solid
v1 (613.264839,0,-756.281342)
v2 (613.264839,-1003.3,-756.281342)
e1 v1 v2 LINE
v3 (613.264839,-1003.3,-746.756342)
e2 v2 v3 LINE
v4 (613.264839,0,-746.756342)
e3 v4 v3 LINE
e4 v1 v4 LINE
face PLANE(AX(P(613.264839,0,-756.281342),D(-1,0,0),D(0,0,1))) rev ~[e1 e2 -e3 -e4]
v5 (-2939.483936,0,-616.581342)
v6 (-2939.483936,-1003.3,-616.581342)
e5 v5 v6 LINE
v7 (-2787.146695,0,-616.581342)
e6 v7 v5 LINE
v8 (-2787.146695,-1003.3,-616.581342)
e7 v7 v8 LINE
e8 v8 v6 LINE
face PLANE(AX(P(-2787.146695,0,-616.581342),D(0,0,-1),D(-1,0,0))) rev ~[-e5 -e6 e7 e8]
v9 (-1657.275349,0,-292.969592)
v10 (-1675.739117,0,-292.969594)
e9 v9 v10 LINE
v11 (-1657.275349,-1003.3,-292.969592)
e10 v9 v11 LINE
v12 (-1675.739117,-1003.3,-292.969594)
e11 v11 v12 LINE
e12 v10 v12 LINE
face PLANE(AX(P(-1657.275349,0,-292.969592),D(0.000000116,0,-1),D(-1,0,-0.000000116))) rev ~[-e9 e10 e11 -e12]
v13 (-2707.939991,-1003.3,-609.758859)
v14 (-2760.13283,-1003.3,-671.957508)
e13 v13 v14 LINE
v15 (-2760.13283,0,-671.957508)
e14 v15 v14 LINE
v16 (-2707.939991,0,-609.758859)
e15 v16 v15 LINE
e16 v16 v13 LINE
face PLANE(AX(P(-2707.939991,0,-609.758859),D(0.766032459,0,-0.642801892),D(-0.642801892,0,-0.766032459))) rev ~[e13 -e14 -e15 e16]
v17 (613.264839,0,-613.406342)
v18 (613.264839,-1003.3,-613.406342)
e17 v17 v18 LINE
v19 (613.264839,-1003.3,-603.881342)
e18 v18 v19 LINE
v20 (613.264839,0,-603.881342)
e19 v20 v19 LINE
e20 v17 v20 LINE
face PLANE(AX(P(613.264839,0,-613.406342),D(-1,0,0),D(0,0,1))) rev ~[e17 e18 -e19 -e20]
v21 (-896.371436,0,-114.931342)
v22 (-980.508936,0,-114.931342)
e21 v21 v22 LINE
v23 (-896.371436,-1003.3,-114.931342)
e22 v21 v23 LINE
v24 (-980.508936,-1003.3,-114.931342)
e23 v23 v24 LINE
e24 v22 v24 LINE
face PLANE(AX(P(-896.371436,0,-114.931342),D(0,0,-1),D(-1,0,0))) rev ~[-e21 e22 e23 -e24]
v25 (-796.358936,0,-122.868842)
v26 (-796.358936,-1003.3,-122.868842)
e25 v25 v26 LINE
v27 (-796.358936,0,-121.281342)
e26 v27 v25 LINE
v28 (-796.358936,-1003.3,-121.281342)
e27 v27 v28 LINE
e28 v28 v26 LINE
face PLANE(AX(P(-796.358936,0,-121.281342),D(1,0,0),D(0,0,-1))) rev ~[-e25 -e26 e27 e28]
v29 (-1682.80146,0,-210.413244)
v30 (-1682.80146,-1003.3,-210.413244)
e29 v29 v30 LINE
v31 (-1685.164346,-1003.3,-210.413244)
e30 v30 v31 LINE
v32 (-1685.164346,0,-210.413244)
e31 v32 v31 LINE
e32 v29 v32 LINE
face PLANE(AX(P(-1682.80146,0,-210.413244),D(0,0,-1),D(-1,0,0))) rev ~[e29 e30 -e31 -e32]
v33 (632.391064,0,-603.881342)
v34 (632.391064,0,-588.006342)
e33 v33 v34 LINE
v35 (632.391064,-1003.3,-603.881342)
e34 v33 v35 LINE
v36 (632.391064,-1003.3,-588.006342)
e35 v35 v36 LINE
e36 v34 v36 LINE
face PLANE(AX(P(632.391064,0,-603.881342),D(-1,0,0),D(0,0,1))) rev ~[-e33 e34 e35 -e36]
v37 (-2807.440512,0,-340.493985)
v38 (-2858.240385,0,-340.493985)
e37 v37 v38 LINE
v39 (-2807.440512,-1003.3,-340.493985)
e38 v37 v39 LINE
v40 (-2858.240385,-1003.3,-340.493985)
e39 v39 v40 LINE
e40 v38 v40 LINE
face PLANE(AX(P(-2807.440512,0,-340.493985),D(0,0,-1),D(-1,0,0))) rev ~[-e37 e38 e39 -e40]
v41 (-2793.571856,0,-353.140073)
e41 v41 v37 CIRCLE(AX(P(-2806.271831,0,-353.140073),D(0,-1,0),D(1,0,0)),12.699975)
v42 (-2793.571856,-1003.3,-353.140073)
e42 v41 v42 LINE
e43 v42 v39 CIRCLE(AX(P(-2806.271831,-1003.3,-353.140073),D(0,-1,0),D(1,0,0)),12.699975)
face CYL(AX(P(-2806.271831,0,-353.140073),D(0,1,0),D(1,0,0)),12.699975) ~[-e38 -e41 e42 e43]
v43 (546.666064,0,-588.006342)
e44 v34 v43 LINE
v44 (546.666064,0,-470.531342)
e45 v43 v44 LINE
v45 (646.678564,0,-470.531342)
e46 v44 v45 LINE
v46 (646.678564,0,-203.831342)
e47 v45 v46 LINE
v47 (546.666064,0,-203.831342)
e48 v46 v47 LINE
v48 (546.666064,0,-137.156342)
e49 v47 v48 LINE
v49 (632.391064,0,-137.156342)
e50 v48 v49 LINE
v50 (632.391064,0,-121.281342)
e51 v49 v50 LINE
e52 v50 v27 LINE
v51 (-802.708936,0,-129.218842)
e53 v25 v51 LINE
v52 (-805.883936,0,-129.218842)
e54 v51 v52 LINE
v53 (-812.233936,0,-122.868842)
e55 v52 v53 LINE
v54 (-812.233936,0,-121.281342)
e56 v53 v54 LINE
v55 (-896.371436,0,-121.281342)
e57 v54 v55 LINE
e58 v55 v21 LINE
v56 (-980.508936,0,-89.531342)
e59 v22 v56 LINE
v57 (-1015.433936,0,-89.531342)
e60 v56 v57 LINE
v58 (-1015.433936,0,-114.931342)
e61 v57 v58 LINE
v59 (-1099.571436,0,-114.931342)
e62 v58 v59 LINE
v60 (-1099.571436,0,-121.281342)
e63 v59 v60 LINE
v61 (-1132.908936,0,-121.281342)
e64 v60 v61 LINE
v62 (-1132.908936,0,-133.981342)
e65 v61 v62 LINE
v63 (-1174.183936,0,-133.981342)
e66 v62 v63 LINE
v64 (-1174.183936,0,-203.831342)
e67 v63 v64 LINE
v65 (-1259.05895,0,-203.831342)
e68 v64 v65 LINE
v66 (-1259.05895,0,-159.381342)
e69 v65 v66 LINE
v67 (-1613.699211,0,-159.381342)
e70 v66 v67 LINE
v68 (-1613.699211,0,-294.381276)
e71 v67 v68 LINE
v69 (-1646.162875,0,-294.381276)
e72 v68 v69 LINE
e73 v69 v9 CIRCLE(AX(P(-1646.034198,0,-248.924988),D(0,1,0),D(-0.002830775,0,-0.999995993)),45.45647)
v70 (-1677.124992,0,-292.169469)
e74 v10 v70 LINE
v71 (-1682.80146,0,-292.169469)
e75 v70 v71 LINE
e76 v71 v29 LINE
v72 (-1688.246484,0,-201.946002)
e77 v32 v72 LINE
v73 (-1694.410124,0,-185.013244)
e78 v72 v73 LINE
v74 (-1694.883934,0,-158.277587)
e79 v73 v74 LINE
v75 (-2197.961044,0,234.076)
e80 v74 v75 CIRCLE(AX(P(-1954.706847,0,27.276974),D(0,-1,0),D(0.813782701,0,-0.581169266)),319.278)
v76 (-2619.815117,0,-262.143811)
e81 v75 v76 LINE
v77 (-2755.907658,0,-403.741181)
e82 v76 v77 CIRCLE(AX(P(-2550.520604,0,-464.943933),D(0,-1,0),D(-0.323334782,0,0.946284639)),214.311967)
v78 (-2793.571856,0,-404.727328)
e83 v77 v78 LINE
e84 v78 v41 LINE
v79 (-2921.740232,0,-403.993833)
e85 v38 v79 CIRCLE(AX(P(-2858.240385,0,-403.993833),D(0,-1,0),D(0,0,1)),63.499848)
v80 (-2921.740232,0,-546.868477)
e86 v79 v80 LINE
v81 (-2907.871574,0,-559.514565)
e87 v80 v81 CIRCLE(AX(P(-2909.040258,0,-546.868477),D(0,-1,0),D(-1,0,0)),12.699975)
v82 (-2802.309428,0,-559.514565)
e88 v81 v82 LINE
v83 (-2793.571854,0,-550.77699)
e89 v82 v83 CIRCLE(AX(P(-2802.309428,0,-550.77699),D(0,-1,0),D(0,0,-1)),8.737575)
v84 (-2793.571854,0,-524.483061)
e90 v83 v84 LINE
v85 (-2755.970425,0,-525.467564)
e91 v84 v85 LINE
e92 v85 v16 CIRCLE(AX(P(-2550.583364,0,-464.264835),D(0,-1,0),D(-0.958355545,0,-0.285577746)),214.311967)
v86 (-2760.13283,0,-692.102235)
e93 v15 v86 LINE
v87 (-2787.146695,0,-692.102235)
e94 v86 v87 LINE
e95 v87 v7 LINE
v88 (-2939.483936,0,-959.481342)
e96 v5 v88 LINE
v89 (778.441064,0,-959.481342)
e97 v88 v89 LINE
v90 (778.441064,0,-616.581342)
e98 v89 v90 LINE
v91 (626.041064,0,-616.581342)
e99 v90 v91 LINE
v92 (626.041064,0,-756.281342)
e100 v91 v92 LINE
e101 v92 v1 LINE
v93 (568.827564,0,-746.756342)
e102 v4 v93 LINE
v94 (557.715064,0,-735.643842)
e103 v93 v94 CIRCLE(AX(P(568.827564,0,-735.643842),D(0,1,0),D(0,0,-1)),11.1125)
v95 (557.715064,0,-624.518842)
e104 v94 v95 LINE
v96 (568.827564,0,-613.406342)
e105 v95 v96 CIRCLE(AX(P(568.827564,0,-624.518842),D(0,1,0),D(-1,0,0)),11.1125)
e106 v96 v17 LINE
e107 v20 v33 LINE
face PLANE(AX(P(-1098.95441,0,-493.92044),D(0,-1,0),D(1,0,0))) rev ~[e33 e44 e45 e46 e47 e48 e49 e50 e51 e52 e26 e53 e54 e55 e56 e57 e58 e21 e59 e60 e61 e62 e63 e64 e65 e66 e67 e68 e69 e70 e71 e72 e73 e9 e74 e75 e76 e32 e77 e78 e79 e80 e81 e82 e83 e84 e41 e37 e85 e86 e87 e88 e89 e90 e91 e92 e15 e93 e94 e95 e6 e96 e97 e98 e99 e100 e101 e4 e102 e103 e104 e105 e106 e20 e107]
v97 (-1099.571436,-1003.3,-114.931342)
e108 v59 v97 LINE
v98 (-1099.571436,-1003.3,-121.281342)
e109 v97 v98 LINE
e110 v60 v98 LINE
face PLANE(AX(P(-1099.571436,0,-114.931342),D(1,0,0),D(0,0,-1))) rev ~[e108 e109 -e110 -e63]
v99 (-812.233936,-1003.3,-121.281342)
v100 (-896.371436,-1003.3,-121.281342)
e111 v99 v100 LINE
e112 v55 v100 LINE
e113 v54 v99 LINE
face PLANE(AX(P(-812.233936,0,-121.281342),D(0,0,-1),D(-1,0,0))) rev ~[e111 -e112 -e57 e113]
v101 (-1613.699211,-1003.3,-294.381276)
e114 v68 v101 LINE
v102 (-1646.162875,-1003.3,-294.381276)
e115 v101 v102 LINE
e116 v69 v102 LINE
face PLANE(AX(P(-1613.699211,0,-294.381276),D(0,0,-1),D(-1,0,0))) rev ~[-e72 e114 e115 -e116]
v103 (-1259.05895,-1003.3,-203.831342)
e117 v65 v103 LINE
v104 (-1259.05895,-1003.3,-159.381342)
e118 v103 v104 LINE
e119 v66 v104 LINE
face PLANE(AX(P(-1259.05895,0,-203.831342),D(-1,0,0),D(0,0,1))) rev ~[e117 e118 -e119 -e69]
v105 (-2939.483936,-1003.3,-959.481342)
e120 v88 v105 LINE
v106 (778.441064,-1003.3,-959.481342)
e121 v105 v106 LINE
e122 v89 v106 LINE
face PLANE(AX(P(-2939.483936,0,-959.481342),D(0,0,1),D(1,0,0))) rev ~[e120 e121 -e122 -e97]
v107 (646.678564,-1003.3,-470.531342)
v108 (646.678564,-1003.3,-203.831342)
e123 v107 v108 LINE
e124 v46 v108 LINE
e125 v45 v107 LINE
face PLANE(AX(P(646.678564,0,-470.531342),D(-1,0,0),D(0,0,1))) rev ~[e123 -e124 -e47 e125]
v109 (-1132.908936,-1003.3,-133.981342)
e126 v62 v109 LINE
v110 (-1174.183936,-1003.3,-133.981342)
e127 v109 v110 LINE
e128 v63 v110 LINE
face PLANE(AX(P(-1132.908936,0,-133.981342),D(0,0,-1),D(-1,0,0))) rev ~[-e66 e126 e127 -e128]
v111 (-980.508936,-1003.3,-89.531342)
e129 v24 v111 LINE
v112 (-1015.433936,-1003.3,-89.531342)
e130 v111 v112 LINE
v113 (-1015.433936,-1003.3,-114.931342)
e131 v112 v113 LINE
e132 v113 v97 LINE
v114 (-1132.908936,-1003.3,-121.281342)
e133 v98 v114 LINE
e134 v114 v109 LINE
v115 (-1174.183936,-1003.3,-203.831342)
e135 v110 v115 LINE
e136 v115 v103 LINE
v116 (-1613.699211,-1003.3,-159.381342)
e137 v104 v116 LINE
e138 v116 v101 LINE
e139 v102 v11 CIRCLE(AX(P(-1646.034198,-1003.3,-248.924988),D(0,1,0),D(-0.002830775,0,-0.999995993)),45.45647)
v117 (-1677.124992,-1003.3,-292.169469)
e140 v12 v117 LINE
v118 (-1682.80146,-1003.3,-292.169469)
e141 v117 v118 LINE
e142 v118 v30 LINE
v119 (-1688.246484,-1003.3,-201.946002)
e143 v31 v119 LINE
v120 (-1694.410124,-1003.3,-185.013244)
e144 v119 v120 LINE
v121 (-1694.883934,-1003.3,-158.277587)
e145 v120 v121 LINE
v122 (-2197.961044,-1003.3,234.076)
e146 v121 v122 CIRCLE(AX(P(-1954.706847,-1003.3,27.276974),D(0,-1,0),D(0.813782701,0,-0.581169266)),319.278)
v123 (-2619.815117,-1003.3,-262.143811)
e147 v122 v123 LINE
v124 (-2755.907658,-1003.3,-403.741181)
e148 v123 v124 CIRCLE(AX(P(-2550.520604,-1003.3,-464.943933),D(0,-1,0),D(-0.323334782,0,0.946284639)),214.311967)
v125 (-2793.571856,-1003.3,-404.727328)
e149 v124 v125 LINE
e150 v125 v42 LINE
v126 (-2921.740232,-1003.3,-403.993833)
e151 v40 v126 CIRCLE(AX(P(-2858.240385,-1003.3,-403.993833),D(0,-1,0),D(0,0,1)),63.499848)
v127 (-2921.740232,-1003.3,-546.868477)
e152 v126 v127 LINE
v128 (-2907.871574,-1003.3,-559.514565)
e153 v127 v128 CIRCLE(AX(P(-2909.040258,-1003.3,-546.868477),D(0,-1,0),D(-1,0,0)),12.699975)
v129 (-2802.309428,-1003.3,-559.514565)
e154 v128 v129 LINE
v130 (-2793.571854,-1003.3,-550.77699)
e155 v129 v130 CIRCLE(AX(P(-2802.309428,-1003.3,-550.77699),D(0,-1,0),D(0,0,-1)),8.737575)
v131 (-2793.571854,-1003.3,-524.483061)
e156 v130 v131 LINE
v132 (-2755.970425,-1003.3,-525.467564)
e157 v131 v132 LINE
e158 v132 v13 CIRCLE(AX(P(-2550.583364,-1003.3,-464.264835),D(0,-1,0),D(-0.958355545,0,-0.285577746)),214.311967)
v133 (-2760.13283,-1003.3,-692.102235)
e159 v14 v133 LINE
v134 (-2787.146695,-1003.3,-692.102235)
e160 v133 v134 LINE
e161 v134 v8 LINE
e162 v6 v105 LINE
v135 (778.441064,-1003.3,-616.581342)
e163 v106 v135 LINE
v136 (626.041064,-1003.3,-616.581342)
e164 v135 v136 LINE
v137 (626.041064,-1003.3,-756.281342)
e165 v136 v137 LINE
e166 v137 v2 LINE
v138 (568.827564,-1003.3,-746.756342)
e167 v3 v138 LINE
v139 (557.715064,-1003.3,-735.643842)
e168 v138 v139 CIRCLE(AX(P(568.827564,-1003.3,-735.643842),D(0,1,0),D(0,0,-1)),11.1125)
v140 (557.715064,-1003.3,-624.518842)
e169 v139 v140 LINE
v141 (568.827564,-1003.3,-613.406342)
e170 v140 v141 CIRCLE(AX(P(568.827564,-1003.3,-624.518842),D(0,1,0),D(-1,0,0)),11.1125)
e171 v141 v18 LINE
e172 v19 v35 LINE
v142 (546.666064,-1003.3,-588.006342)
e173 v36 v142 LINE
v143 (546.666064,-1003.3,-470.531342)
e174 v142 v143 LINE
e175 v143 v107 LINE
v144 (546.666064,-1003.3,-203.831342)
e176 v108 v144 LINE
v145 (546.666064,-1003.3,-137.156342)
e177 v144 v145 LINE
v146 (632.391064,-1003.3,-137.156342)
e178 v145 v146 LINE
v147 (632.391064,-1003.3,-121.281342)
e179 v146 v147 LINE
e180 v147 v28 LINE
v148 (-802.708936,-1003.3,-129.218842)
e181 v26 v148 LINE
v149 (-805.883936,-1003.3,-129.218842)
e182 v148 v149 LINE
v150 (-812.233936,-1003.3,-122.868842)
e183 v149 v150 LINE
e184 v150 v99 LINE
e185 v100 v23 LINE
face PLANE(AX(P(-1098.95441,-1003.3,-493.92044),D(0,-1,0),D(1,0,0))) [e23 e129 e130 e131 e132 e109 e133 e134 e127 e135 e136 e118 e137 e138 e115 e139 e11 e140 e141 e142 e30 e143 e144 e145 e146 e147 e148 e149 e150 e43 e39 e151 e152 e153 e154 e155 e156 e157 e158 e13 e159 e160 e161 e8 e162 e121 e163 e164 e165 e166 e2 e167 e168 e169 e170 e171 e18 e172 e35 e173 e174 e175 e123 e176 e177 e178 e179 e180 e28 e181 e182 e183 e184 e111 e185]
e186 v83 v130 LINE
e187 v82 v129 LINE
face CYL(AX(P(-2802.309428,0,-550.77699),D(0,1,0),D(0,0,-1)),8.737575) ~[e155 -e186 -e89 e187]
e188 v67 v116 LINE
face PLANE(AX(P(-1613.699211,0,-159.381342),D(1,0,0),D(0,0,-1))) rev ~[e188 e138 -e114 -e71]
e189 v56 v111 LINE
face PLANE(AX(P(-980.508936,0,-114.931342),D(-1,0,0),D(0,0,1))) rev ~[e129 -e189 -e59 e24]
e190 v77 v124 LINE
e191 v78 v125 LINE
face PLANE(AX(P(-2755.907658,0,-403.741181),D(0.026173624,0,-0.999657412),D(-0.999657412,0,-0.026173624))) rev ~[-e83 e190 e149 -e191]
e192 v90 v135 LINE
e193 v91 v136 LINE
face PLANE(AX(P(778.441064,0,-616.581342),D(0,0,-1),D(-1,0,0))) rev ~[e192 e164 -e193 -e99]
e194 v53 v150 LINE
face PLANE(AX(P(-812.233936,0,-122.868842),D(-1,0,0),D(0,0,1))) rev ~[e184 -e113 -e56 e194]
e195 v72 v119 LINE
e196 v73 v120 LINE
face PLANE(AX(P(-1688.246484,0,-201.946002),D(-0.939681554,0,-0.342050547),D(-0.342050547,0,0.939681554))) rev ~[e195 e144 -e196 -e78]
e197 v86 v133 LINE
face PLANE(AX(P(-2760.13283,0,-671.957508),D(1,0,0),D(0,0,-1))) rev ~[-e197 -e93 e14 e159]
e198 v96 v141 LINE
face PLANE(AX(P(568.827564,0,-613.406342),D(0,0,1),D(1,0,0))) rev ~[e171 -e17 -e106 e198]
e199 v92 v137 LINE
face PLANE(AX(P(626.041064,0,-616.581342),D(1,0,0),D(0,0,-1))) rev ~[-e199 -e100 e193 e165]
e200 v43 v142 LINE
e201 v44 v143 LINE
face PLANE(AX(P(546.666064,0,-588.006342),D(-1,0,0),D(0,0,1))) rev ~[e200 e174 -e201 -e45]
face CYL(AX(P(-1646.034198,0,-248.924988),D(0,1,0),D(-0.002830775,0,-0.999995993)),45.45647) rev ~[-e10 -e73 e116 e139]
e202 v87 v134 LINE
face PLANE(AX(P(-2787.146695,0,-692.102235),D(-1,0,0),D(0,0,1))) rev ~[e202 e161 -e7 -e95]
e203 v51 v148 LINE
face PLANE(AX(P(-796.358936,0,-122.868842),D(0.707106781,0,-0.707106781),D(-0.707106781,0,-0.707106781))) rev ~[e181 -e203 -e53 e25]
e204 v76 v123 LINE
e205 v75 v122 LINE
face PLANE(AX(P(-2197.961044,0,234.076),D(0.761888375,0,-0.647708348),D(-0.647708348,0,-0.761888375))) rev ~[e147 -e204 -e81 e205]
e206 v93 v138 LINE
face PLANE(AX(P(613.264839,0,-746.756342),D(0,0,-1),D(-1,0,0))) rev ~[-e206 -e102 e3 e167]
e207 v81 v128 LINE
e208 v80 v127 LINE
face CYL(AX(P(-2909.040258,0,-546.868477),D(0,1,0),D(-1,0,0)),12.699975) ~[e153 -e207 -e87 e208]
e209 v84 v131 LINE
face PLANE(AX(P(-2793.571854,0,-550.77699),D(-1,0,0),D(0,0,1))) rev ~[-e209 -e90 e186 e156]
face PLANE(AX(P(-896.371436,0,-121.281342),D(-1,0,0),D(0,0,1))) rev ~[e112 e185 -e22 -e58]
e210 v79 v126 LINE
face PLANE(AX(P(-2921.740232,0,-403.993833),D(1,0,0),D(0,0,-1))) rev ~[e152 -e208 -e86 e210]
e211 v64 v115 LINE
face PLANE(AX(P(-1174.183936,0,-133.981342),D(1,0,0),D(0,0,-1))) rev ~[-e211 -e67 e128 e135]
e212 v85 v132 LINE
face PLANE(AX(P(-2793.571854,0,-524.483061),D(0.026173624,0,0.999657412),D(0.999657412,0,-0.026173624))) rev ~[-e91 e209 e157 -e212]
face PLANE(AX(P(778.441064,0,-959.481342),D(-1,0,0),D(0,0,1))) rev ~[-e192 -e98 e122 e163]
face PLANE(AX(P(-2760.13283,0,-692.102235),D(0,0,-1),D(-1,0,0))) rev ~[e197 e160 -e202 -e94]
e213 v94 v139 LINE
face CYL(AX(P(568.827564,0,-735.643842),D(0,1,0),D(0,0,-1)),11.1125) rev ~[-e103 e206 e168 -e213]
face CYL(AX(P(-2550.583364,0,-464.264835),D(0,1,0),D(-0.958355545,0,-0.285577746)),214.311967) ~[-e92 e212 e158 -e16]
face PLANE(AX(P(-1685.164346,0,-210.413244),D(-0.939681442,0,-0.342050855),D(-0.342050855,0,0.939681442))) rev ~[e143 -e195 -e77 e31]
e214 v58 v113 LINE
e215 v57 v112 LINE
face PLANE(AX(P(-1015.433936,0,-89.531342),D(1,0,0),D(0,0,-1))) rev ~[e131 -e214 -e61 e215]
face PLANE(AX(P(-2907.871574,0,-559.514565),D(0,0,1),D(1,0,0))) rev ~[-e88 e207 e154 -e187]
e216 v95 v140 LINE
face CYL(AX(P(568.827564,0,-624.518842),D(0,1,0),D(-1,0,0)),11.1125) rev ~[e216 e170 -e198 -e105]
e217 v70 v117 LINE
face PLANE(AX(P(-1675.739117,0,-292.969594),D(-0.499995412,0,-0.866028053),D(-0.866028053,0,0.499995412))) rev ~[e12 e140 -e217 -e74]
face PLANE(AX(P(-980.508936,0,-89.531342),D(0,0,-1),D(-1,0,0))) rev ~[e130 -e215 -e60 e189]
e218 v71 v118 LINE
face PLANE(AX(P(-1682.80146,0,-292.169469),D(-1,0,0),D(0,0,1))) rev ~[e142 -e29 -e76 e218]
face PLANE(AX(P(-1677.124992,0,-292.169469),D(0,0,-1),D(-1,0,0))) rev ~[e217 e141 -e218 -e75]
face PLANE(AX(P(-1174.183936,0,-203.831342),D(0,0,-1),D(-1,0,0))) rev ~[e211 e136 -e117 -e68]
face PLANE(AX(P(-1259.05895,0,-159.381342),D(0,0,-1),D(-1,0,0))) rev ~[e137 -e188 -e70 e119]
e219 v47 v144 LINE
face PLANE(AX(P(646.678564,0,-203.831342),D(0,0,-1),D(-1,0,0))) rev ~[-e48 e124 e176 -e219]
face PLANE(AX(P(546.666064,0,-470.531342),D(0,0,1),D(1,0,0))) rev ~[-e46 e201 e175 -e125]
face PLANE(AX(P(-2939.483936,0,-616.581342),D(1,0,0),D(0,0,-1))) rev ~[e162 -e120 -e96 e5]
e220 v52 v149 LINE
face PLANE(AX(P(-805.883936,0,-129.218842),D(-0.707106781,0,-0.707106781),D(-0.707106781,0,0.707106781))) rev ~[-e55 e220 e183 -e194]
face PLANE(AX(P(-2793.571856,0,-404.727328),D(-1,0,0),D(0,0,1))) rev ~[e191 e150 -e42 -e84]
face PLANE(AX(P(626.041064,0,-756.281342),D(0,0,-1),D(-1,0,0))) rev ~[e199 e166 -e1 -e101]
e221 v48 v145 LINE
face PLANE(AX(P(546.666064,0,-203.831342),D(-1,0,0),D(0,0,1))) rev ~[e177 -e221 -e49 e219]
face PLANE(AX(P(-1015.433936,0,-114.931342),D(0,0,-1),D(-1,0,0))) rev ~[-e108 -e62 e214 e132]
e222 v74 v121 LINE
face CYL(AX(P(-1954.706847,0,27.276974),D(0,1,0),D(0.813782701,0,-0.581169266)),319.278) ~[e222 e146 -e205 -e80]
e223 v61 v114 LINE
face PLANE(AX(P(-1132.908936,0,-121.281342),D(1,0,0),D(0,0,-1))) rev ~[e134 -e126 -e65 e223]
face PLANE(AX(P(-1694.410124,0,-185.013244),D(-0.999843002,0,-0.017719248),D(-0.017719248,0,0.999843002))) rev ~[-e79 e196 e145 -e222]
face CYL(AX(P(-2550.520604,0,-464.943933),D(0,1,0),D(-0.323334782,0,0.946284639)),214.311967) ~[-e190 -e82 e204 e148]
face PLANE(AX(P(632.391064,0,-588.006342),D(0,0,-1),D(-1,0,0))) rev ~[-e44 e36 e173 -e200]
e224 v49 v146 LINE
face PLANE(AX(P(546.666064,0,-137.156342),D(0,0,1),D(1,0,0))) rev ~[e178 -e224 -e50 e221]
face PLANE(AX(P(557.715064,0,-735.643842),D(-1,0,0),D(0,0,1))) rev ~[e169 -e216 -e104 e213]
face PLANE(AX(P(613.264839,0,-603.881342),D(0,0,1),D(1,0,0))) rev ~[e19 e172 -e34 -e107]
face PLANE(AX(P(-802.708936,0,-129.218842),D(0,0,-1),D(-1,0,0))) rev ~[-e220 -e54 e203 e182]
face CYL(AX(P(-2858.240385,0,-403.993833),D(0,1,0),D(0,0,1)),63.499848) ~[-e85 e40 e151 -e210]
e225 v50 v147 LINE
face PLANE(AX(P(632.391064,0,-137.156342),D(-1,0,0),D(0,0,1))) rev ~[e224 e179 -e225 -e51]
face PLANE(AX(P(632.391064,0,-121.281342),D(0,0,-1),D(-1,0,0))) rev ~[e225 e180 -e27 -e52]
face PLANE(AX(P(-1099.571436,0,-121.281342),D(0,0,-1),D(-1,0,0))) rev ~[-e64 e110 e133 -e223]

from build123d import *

# Parameters (mm, degrees)
F1_DEPTH = 1003.3


# Not quite as in the source:
# - ends of sketch curves that miss each other by under 0.0002 mm in the source are joined


with BuildPart() as f1:
    # F0 (on Front) → F1 (new body)
    with BuildSketch(Plane.XZ):
        with BuildLine():
            Line((-2939.4839356, -616.5813424), (-2939.4839356, -959.4813424))
            Line((-2939.4839356, -959.4813424), (778.4410644, -959.4813424))
            Line((778.4410644, -959.4813424), (778.4410644, -616.5813424))
            Line((778.4410644, -616.5813424), (626.0410644, -616.5813424))
            Line((626.0410644, -616.5813424), (626.0410644, -756.2813424))
            Line((626.0410644, -756.2813424), (613.264839, -756.2813424))
            Line((613.264839, -756.2813424), (613.264839, -746.7563424))
            Line((613.264839, -746.7563424), (568.8275644, -746.7563424))
            ThreePointArc((568.8275644, -746.7563424), (560.9698402941, -743.5015665059), (557.7150644, -735.6438424))
            Line((557.7150644, -735.6438424), (557.7150644, -624.5188424))
            ThreePointArc((557.7150644, -624.5188424), (560.9698402941, -616.6611182941), (568.8275644, -613.4063424))
            Line((568.8275644, -613.4063424), (613.264839, -613.4063424))
            Line((613.264839, -613.4063424), (613.264839, -603.8813424))
            Line((613.264839, -603.8813424), (632.3910644, -603.8813424))
            Line((632.3910644, -603.8813424), (632.3910644, -588.0063424))
            Line((632.3910644, -588.0063424), (546.6660644, -588.0063424))
            Line((546.6660644, -588.0063424), (546.6660644, -470.5313424))
            Line((546.6660644, -470.5313424), (646.6785644, -470.5313424))
            Line((646.6785644, -470.5313424), (646.6785644, -203.8313424))
            Line((646.6785644, -203.8313424), (546.6660644, -203.8313424))
            Line((546.6660644, -203.8313424), (546.6660644, -137.1563424))
            Line((546.6660644, -137.1563424), (632.3910644, -137.1563424))
            Line((632.3910644, -137.1563424), (632.3910644, -121.2813424))
            Line((632.3910644, -121.2813424), (-796.3589356, -121.2813424))
            Line((-796.3589356, -121.2813424), (-796.3589356, -122.8688424))
            Line((-796.3589356, -122.8688424), (-802.7089356, -129.2188424))
            Line((-802.7089356, -129.2188424), (-805.8839356, -129.2188424))
            Line((-805.8839356, -129.2188424), (-812.2339356, -122.8688424))
            Line((-812.2339356, -122.8688424), (-812.2339356, -121.2813424))
            Line((-812.2339356, -121.2813424), (-896.3714356, -121.2813424))
            Line((-896.3714356, -121.2813424), (-896.3714356, -114.9313424))
            Line((-896.3714356, -114.9313424), (-980.5089356, -114.9313424))
            Line((-980.5089356, -114.9313424), (-980.5089356, -89.5313424))
            Line((-980.5089356, -89.5313424), (-1015.4339356, -89.5313424))
            Line((-1015.4339356, -89.5313424), (-1015.4339356, -114.9313424))
            Line((-1015.4339356, -114.9313424), (-1099.5714356, -114.9313424))
            Line((-1099.5714356, -114.9313424), (-1099.5714356, -121.2813424))
            Line((-1099.5714356, -121.2813424), (-1132.9089356, -121.2813424))
            Line((-1132.9089356, -121.2813424), (-1132.9089356, -133.9813424))
            Line((-1132.9089356, -133.9813424), (-1148.7839356, -133.9813424))
            Line((-1148.7839356, -133.9813424), (-1174.1839356, -133.9813424))
            Line((-1174.1839356, -133.9813424), (-1174.1839356, -203.8313424))
            Line((-1174.1839356, -203.8313424), (-1259.05895, -203.8313424))
            Line((-1259.05895, -203.8313424), (-1259.05895, -159.3813424))
            Line((-1259.05895, -159.3813424), (-1613.699211, -159.3813424))
            Line((-1613.699211, -159.3813424), (-1613.699211, -294.3812756))
            Line((-1613.699211, -294.3812756), (-1646.1628748, -294.3812756))
            ThreePointArc((-1646.1628748, -294.3812756), (-1651.7627631889, -294.0190472383), (-1657.275348851, -292.9695922491))
            Line((-1657.275348851, -292.9695922491), (-1675.7391174, -292.9695944))
            Line((-1675.7391174, -292.9695944), (-1677.1249922, -292.169469))
            Line((-1677.1249922, -292.169469), (-1682.8014604, -292.169469))
            Line((-1682.8014604, -292.169469), (-1682.8014604, -210.4132444))
            Line((-1682.8014604, -210.4132444), (-1685.1643462, -210.4132444))
            Line((-1685.1643462, -210.4132444), (-1688.2464838, -201.946002))
            Line((-1688.2464838, -201.946002), (-1694.410124, -185.0132444))
            Line((-1694.410124, -185.0132444), (-1694.8839341458, -158.2775865747))
            ThreePointArc((-1694.8839341458, -158.2775865747), (-1758.355211766, 279.0397129741), (-2197.9610443697, 234.0759997359))
            Line((-2197.9610443697, 234.0759997359), (-2619.8151165819, -262.1438110898))
            ThreePointArc((-2619.8151165819, -262.1438110898), (-2705.0357961417, -316.4357706996), (-2755.9076582696, -403.7411814515))
            Line((-2755.9076582696, -403.7411814515), (-2793.5718559027, -404.7273278365))
            Line((-2793.5718559027, -404.7273278365), (-2793.5718559027, -353.1400729063))
            ThreePointArc((-2793.5718559027, -353.1400729063), (-2797.7147534728, -343.7557355538), (-2807.4405116, -340.493985))
            Line((-2807.4405116, -340.493985), (-2858.2403846, -340.493985))
            ThreePointArc((-2858.2403846, -340.493985), (-2903.1415574423, -359.0926597577), (-2921.7402322, -403.9938326))
            Line((-2921.7402322, -403.9938326), (-2921.7402322, -546.868477))
            ThreePointArc((-2921.7402322, -546.868477), (-2917.5973338103, -556.2528150998), (-2907.8715742938, -559.5145647022))
            Line((-2907.8715742938, -559.5145647022), (-2802.3094282938, -559.5145647022))
            ThreePointArc((-2802.3094282938, -559.5145647022), (-2796.1310300431, -556.9553883529), (-2793.5718536938, -550.7769901022))
            Line((-2793.5718536938, -550.7769901022), (-2793.5718536938, -524.4830607299))
            Line((-2793.5718536938, -524.4830607299), (-2755.9704253207, -525.4675636528))
            ThreePointArc((-2755.9704253207, -525.4675636528), (-2736.7875568064, -570.3667556741), (-2707.9399906828, -609.7588591639))
            Line((-2707.9399906828, -609.7588591639), (-2760.1328298938, -671.9575077155))
            Line((-2760.1328298938, -671.9575077155), (-2760.1328298938, -692.1022345022))
            Line((-2760.1328298938, -692.1022345022), (-2787.1466950938, -692.1022345022))
            Line((-2787.1466950938, -692.1022345022), (-2787.1466950938, -616.5813424))
            Line((-2787.1466950938, -616.5813424), (-2939.4839356, -616.5813424))
        make_face()
    extrude(amount=F1_DEPTH)


solid = f1.part
